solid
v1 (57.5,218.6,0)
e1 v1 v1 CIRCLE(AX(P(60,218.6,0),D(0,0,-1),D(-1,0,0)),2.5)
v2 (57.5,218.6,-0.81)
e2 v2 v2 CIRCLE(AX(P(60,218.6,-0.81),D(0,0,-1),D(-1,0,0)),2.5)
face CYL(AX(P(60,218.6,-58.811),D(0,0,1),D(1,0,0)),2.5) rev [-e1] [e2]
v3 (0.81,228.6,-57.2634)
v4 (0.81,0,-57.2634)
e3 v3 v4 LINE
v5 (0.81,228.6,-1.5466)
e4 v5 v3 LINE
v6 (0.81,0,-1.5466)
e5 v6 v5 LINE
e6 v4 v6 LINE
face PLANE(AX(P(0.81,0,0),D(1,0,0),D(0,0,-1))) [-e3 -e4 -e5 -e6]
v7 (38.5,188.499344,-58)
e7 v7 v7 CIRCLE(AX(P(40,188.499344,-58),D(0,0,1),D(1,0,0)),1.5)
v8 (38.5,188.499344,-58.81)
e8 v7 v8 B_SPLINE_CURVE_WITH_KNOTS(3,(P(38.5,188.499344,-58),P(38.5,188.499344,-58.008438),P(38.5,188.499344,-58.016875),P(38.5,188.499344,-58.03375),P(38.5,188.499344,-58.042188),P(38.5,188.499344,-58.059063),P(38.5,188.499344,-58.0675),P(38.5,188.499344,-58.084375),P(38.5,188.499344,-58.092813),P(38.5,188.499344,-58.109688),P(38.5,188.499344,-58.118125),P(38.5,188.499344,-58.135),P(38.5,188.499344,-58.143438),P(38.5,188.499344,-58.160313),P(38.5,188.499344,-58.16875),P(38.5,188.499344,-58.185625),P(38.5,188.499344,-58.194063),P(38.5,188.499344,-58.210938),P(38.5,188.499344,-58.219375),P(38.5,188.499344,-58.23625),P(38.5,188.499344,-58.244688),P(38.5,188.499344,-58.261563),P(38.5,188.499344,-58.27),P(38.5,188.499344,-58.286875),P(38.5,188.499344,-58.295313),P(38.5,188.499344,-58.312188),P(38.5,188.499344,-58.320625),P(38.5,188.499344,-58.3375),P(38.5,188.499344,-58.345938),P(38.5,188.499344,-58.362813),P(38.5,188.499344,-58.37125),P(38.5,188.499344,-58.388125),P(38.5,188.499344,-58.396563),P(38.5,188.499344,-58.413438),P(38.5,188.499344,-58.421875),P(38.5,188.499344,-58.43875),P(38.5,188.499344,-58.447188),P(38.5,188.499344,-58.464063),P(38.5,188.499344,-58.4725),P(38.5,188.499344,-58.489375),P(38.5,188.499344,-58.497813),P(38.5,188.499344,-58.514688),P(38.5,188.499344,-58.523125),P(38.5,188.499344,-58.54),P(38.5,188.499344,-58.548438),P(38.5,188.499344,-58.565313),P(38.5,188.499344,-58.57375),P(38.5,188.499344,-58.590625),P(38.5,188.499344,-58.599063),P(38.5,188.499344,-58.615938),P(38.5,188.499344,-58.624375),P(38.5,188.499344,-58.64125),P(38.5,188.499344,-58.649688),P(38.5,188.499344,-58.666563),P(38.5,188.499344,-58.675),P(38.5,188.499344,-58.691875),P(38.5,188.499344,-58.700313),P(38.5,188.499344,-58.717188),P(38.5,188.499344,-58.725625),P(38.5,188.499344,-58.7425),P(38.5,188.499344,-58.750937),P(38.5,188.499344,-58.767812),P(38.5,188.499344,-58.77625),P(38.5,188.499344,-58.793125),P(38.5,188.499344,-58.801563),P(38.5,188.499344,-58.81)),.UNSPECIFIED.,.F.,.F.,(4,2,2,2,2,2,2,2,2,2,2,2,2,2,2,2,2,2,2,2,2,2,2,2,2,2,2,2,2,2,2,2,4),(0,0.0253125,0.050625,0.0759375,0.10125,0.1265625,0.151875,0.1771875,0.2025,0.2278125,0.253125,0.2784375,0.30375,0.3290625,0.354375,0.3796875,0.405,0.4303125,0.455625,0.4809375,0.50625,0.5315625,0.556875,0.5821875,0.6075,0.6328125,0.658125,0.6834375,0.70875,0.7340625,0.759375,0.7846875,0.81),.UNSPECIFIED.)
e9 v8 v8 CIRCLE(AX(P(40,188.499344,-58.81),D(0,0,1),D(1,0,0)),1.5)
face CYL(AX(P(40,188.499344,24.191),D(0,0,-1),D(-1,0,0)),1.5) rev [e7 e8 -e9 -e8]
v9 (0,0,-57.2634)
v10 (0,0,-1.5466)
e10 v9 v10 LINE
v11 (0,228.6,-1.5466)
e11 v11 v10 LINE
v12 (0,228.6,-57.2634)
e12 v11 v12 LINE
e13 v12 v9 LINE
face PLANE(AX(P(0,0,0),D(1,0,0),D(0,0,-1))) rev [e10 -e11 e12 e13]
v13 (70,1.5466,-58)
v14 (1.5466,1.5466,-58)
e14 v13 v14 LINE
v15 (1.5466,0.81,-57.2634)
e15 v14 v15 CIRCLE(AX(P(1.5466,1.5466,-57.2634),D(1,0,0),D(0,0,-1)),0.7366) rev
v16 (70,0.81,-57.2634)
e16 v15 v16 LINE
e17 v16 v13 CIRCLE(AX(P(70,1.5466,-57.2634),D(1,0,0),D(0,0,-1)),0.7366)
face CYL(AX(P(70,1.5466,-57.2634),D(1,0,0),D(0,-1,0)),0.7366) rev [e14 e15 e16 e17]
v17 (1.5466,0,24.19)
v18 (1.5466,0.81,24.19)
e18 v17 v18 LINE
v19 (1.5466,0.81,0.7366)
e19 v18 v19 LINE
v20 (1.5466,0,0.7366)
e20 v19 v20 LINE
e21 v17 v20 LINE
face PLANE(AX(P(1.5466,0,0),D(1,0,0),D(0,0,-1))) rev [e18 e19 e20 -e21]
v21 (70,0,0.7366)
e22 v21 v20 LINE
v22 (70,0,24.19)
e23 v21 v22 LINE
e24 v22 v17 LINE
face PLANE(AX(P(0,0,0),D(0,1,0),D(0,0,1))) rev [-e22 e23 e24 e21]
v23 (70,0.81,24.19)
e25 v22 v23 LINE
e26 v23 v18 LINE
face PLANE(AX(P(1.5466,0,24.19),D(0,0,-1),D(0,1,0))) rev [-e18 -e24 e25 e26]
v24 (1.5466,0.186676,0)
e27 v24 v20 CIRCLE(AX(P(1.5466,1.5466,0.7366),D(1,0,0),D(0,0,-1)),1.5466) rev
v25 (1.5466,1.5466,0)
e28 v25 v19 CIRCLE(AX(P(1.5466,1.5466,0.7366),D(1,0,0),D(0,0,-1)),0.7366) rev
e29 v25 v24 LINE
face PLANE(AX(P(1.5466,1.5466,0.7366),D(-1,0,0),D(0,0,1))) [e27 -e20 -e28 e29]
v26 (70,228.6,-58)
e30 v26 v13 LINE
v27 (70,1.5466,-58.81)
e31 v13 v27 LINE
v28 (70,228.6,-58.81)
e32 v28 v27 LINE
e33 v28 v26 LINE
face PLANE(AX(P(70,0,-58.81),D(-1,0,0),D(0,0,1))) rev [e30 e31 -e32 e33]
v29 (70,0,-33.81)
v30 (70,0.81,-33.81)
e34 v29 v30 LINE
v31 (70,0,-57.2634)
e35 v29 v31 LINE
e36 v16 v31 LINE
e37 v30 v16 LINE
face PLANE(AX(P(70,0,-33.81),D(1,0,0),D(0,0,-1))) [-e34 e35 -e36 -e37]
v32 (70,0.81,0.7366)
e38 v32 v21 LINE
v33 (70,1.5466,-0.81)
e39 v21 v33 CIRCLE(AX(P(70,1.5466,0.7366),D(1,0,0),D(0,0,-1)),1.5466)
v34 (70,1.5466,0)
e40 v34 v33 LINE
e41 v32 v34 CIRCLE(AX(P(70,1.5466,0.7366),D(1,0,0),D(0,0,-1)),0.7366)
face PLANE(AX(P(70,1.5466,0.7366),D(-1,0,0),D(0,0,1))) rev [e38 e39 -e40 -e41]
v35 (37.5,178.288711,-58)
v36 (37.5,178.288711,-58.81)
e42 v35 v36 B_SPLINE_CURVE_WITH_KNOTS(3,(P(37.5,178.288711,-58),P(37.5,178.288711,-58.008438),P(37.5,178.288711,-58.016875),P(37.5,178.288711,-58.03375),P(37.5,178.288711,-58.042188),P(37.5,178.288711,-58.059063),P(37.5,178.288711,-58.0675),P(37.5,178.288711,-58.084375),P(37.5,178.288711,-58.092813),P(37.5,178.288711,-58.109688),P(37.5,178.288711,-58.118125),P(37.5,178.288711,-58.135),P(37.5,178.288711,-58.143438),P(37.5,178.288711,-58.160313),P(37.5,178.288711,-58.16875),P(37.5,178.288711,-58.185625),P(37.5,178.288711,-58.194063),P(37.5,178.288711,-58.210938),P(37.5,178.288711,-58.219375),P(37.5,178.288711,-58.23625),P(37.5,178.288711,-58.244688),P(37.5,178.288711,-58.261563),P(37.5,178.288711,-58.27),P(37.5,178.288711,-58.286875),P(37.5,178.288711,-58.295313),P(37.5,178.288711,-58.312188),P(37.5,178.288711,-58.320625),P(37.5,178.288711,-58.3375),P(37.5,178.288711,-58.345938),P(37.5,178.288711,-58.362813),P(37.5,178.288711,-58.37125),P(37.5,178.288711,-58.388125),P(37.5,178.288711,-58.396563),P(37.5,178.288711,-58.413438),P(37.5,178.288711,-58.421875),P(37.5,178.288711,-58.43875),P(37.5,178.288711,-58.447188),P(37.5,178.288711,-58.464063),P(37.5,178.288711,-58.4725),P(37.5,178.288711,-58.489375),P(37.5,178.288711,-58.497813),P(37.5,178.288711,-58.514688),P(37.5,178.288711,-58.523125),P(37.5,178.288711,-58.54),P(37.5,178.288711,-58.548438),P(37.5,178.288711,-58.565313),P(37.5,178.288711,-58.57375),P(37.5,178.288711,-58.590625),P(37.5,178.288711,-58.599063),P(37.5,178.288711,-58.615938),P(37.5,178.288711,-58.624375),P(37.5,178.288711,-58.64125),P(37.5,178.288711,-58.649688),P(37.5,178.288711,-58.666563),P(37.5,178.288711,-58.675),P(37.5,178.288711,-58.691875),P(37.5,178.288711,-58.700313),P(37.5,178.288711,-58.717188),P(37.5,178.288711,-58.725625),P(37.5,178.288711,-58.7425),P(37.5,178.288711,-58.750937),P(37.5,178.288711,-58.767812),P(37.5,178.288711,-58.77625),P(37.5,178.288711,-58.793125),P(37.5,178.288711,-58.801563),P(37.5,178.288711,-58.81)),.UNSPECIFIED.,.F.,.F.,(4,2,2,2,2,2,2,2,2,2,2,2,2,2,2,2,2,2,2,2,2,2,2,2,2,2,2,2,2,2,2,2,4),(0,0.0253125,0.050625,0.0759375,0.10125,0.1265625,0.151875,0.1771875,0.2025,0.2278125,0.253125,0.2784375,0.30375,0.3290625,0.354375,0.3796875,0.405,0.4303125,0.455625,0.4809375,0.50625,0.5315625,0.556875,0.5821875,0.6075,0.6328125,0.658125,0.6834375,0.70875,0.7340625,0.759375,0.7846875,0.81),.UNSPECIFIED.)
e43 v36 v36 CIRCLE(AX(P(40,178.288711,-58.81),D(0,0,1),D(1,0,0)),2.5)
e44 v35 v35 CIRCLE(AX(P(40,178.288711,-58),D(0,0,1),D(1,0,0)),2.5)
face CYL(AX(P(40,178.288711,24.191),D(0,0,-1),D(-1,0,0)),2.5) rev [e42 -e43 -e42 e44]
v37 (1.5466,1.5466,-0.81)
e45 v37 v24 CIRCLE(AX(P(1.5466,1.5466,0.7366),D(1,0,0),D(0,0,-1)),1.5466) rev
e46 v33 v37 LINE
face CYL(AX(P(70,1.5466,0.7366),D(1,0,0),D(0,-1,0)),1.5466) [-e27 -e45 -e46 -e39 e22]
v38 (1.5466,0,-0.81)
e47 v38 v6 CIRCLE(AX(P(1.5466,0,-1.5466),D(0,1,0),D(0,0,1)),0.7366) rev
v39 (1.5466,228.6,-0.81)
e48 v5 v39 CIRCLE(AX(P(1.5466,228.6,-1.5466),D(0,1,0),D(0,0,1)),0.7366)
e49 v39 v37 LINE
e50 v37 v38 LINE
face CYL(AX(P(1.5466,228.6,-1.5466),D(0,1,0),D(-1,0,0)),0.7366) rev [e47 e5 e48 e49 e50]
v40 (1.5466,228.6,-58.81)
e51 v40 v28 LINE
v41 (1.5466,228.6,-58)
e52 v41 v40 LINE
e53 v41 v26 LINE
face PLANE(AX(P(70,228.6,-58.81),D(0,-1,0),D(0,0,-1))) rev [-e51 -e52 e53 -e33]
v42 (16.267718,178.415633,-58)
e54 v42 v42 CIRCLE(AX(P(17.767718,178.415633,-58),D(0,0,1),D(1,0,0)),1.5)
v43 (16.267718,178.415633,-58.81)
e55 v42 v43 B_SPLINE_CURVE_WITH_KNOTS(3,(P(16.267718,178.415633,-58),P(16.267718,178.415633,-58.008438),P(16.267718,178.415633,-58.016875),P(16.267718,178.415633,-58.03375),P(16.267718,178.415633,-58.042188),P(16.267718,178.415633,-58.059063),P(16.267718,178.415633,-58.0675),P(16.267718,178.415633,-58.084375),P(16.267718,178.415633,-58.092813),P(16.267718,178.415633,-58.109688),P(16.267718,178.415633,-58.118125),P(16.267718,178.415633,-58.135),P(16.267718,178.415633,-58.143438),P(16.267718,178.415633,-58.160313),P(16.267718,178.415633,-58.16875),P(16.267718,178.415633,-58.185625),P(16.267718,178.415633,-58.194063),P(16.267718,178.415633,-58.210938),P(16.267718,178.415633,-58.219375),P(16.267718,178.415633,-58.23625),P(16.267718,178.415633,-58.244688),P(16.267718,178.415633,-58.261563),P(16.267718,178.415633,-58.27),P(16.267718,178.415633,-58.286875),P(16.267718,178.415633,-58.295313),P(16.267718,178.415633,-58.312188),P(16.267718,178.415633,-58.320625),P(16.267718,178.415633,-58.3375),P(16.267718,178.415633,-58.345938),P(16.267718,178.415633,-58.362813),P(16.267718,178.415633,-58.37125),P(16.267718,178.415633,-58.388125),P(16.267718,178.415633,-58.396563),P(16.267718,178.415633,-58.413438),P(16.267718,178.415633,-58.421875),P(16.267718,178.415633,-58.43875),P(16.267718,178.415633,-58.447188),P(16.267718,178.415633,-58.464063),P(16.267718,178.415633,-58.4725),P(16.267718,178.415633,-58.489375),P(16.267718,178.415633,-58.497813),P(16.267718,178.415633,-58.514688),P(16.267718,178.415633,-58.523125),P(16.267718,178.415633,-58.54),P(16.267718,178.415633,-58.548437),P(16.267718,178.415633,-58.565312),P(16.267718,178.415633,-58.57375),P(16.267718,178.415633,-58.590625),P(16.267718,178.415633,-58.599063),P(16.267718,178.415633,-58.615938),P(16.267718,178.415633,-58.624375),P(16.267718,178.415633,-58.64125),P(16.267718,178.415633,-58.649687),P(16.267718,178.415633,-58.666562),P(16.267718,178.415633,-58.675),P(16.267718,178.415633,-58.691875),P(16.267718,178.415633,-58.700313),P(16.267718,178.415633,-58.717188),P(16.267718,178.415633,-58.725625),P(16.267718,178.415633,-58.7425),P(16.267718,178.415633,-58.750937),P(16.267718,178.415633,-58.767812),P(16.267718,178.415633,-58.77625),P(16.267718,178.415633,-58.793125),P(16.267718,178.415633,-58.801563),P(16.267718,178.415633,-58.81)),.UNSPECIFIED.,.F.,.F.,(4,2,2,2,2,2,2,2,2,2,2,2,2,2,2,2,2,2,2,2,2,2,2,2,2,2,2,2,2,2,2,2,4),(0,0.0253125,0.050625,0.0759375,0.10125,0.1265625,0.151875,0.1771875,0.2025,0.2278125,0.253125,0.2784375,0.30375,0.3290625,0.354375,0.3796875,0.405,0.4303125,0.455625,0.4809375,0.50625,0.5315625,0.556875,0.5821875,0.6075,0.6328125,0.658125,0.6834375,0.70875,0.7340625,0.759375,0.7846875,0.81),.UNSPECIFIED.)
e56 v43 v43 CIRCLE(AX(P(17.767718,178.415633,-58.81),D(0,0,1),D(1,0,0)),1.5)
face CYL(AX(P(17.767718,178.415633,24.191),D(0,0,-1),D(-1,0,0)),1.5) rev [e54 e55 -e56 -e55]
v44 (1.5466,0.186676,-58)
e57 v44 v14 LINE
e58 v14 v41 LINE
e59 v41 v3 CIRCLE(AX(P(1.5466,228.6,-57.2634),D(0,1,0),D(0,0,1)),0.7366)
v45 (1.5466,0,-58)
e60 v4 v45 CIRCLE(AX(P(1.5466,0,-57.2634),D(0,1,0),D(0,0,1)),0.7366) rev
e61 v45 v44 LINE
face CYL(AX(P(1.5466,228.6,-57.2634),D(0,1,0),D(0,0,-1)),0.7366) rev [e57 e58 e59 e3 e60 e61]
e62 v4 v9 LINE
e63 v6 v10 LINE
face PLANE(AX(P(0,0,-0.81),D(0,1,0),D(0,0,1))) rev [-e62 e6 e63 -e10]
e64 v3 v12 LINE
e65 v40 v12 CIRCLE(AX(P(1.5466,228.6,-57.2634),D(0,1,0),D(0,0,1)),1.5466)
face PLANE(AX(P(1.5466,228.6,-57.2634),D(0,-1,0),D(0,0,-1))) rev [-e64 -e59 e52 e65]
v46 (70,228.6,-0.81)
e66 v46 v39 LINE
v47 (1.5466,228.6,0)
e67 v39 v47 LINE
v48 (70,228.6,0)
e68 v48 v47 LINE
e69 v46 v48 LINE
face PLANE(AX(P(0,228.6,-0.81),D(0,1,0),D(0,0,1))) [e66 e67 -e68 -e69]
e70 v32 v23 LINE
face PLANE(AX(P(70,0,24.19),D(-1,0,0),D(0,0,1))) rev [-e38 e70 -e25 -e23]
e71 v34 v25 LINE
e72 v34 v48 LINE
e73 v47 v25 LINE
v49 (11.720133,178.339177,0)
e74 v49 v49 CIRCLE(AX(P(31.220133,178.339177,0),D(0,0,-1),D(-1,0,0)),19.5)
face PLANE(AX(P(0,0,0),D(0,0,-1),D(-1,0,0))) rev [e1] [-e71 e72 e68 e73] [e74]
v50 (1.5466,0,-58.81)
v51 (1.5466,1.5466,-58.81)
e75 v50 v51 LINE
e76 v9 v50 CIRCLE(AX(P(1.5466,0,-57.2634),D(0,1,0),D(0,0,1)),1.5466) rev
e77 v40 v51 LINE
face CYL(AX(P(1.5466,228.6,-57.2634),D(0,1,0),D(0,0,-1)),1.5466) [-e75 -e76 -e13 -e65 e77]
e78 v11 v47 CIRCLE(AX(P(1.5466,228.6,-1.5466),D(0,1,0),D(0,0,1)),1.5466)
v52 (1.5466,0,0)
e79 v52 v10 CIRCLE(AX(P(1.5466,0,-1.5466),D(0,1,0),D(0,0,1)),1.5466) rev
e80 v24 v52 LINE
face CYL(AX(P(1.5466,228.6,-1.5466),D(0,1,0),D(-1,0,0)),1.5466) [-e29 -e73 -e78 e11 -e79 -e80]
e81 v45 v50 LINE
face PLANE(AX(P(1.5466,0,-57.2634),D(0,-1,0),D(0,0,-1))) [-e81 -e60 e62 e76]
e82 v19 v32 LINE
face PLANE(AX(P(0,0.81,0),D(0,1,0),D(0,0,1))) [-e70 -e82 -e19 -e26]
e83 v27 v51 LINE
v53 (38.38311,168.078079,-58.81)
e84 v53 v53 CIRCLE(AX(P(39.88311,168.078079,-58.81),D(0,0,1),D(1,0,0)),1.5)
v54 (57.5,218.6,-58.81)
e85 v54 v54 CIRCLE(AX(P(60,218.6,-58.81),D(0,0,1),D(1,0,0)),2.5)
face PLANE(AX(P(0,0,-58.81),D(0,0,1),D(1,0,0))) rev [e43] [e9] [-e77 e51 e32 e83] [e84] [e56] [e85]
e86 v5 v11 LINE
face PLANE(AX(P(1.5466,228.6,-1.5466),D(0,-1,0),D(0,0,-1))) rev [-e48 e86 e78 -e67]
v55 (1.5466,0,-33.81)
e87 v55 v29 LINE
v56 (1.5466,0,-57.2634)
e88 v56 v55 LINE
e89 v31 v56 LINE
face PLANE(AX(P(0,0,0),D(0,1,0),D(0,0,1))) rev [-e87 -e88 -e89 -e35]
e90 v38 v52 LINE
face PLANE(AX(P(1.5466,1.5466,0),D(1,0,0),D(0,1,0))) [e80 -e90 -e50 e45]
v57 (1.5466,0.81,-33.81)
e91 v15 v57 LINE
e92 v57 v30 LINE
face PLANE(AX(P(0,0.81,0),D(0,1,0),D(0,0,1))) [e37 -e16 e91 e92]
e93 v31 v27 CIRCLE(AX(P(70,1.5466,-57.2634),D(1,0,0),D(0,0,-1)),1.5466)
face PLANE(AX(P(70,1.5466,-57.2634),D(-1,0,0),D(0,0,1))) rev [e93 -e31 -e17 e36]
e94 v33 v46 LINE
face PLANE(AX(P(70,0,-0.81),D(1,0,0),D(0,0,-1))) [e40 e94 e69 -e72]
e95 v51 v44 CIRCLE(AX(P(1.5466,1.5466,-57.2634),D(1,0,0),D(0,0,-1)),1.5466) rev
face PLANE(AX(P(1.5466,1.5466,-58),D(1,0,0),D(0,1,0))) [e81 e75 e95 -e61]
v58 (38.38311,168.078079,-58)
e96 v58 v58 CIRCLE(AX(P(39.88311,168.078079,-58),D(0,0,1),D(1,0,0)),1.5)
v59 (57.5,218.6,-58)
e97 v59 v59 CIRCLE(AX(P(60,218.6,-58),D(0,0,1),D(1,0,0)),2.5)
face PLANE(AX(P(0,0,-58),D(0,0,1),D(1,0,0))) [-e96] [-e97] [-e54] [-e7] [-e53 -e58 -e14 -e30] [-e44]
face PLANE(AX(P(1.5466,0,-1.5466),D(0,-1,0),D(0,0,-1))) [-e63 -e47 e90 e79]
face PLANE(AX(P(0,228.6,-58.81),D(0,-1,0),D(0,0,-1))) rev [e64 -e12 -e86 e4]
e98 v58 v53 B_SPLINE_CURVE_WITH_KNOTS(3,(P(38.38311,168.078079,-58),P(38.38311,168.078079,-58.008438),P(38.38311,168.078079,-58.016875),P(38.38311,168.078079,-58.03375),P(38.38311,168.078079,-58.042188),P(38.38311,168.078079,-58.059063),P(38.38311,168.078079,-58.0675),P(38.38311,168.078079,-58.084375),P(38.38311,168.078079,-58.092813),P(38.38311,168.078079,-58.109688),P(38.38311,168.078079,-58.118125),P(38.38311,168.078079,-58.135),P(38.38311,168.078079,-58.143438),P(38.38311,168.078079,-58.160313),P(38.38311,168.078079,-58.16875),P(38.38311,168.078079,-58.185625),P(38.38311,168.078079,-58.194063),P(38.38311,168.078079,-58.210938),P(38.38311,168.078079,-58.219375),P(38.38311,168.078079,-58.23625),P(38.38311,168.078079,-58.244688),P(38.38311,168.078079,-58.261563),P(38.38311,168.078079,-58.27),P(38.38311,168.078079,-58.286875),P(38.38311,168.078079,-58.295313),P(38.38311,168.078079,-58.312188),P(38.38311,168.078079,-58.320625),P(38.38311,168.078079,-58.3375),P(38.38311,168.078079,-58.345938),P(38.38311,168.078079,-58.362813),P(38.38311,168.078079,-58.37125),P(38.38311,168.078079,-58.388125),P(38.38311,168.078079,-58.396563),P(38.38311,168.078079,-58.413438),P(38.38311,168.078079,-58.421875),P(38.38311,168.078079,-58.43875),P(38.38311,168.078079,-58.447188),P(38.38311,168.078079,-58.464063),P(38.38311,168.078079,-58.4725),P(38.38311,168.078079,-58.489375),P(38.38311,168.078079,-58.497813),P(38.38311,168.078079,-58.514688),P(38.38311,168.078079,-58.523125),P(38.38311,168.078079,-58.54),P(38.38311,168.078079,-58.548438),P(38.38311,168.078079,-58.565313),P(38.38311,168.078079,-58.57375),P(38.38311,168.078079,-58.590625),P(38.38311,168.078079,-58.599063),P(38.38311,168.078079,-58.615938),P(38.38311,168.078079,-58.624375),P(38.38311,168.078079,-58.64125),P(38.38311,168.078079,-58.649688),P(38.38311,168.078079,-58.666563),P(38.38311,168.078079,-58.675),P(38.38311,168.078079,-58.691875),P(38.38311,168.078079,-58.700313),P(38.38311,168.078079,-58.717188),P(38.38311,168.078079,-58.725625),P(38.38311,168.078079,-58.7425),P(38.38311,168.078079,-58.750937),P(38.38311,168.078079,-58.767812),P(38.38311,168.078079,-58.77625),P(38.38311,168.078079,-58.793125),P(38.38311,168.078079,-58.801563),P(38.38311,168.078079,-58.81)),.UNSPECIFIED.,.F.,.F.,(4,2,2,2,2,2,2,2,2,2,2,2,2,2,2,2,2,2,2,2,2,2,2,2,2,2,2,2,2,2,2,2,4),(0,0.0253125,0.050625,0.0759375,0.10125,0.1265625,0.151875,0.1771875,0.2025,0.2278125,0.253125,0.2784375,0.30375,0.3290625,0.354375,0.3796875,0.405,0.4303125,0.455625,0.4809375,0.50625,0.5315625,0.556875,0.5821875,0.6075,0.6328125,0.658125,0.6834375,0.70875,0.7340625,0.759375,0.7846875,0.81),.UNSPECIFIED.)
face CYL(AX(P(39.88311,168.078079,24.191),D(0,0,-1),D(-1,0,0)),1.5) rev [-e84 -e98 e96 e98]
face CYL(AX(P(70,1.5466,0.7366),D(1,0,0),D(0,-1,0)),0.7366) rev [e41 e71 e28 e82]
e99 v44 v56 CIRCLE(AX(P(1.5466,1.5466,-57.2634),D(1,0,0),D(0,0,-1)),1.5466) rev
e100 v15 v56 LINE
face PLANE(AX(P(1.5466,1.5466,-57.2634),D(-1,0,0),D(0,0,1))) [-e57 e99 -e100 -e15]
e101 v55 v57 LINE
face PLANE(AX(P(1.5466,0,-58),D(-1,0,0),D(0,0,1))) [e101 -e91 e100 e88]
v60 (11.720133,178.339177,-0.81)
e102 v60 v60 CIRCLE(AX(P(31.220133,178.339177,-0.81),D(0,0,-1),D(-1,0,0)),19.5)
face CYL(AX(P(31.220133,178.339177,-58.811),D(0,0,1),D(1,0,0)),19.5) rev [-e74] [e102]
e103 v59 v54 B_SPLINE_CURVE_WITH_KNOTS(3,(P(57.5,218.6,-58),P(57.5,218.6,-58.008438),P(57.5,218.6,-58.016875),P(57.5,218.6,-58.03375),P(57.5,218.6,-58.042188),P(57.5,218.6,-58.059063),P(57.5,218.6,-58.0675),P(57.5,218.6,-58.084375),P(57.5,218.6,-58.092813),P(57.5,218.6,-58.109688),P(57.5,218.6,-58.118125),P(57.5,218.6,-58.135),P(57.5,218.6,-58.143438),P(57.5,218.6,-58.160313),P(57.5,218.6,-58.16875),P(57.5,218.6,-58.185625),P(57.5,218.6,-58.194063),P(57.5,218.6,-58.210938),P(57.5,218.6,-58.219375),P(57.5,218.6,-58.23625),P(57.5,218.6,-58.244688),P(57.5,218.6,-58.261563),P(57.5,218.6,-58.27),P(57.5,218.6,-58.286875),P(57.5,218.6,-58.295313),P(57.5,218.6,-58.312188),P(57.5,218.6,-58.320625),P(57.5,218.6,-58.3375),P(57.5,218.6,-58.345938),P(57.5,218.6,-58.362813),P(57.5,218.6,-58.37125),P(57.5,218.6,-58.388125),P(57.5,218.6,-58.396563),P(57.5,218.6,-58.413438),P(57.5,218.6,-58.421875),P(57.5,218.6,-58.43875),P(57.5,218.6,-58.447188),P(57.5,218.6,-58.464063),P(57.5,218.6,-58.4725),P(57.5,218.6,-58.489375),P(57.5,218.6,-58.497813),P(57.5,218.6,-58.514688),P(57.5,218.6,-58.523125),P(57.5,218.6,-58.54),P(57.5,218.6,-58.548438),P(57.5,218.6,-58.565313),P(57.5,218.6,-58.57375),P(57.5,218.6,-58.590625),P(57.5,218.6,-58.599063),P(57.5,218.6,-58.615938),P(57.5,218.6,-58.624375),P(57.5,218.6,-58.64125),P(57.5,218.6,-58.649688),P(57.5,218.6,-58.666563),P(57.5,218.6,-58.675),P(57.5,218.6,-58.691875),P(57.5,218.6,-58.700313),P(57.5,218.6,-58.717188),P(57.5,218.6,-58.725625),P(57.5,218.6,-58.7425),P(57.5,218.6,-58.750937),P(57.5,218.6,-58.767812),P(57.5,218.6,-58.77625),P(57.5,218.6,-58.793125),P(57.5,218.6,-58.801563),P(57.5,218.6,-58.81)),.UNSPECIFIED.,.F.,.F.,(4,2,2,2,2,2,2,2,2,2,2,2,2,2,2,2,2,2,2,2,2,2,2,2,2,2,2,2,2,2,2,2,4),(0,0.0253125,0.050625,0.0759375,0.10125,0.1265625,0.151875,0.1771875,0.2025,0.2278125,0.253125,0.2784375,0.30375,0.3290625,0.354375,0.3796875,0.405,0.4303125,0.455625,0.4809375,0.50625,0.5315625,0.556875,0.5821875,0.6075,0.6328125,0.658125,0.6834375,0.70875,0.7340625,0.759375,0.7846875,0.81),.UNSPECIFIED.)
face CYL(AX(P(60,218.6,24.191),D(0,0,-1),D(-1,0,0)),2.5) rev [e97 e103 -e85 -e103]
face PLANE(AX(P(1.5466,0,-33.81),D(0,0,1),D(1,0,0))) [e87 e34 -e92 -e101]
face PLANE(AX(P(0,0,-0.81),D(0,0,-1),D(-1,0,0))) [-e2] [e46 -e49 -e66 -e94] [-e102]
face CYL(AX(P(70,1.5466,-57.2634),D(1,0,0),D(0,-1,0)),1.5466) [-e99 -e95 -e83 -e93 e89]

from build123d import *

# Parameters (mm, degrees)
SKETCH1_W                      = 70
SKETCH1_H                      = 228.6
BASE_FLANGE1_DEPTH             = 0.81
EDGE_FLANGE1_STRIP_W           = 4.7132
EDGE_FLANGE1_STRIP_H           = 0.81
EDGE_FLANGE1_STRIP_CUT_DEPTH   = 228.6
EDGE_FLANGE1_DEPTH             = 228.6
EDGE_FLANGE2_STRIP_W           = 4.7132
EDGE_FLANGE2_STRIP_H           = 0.81
EDGE_FLANGE2_STRIP_CUT_DEPTH   = 228.6
EDGE_FLANGE2_DEPTH             = 228.6
EDGE_FLANGE3_STRIP_W           = 4.7132
EDGE_FLANGE3_STRIP_H           = 0.81
EDGE_FLANGE3_STRIP_CUT_DEPTH   = 68.4534
EDGE_FLANGE3_STRIP_2_W         = 4.7132
EDGE_FLANGE3_STRIP_2_H         = 0.81
EDGE_FLANGE3_STRIP_CUT_2_DEPTH = 68.4534
EDGE_FLANGE3_DEPTH             = 68.4534
EDGE_FLANGE3_BEND_DEPTH        = 68.4534
CUT_EXTRUDE2_REACH             = 255.075
SKETCH18_R                     = 2.5
SKETCH18_R_2                   = 1.5
CUT_EXTRUDE1_REACH             = 248.204
SKETCH17_R                     = 19.5
SKETCH17_R_2                   = 2.5


# Sheet-metal steps are written as plain solids
with BuildPart() as part:
    # Sketch1 → Base-Flange1 (new body)
    with BuildSketch(Plane.XY):
        with Locations((35, 114.3)):
            Rectangle(SKETCH1_W, SKETCH1_H)
    extrude(amount=-BASE_FLANGE1_DEPTH)

    # Edge-Flange1 strip (across the edge) → Edge-Flange1 strip cut (cut)
    with BuildSketch(Plane(origin=(0, 0, -0.81), x_dir=(1, 0, 0), z_dir=(0, 1, 0))):
        with Locations((-0.81, -0.405)):
            Rectangle(EDGE_FLANGE1_STRIP_W, EDGE_FLANGE1_STRIP_H)
    extrude(amount=EDGE_FLANGE1_STRIP_CUT_DEPTH, mode=Mode.SUBTRACT)

    # Edge-Flange1 section (across the edge) → Edge-Flange1 (add)
    with BuildSketch(Plane(origin=(0, 0, -0.81), x_dir=(1, 0, 0), z_dir=(0, 1, 0))):
        with BuildLine():
            Line((0, 0.7366), (0, 58))
            Line((0, 58), (0.81, 58))
            Line((0.81, 58), (0.81, 0.7366))
            ThreePointArc((0.81, 0.7366), (1.025745145, 0.215745145), (1.5466, 0))
            Line((1.5466, 0), (1.5466, -0.81))
            ThreePointArc((1.5466, -0.81), (0.452988652, -0.357011348), (0, 0.7366))
        make_face()
    extrude(amount=EDGE_FLANGE1_DEPTH)

    # Edge-Flange2 strip (across the edge) → Edge-Flange2 strip cut (cut)
    with BuildSketch(Plane(origin=(0.81, 0, -58.81), x_dir=(0, 0, 1), z_dir=(0, 1, 0))):
        with Locations((-0.81, -0.405)):
            Rectangle(EDGE_FLANGE2_STRIP_W, EDGE_FLANGE2_STRIP_H)
    extrude(amount=EDGE_FLANGE2_STRIP_CUT_DEPTH, mode=Mode.SUBTRACT)

    # Edge-Flange2 section (across the edge) → Edge-Flange2 (add)
    with BuildSketch(Plane(origin=(0.81, 0, -58.81), x_dir=(0, 0, 1), z_dir=(0, 1, 0))):
        with BuildLine():
            Line((0, 0.7366), (0, 69.19))
            Line((0, 69.19), (0.81, 69.19))
            Line((0.81, 69.19), (0.81, 0.7366))
            ThreePointArc((0.81, 0.7366), (1.025745145, 0.215745145), (1.5466, 0))
            Line((1.5466, 0), (1.5466, -0.81))
            ThreePointArc((1.5466, -0.81), (0.452988652, -0.357011348), (0, 0.7366))
        make_face()
    extrude(amount=EDGE_FLANGE2_DEPTH)

    # Edge-Flange3 strip (across the edge) → Edge-Flange3 strip cut (cut)
    with BuildSketch(Plane.YZ.offset(1.5466)):
        with Locations((-0.81, -0.405)):
            Rectangle(EDGE_FLANGE3_STRIP_W, EDGE_FLANGE3_STRIP_H)
    extrude(amount=EDGE_FLANGE3_STRIP_CUT_DEPTH, mode=Mode.SUBTRACT)

    # Edge-Flange3 strip 2 (across the edge) → Edge-Flange3 strip cut 2 (cut)
    with BuildSketch(Plane(origin=(1.5466, 0, -58), x_dir=(0, 1, 0), z_dir=(1, 0, 0))):
        with Locations((-0.81, -0.405)):
            Rectangle(EDGE_FLANGE3_STRIP_2_W, EDGE_FLANGE3_STRIP_2_H)
    extrude(amount=EDGE_FLANGE3_STRIP_CUT_2_DEPTH, mode=Mode.SUBTRACT)

    # Edge-Flange3 section (across the edge) → Edge-Flange3 (add)
    with BuildSketch(Plane.YZ.offset(1.5466)):
        with BuildLine():
            Line((0, 0.7366), (0, 24.19))
            Line((0, 24.19), (0.81, 24.19))
            Line((0.81, 24.19), (0.81, 0.7366))
            ThreePointArc((0.81, 0.7366), (1.025745145, 0.215745145), (1.5466, 0))
            Line((1.5466, 0), (1.5466, -0.81))
            ThreePointArc((1.5466, -0.81), (0.452988652, -0.357011348), (0, 0.7366))
        make_face()
    extrude(amount=EDGE_FLANGE3_DEPTH)

    # Edge-Flange3 section 2 (across the edge) → Edge-Flange3 bend (add)
    with BuildSketch(Plane(origin=(1.5466, 0, -58), x_dir=(0, 1, 0), z_dir=(1, 0, 0))):
        with BuildLine():
            Line((0, 0.7366), (0, 24.19))
            Line((0, 24.19), (0.81, 24.19))
            Line((0.81, 24.19), (0.81, 0.7366))
            ThreePointArc((0.81, 0.7366), (1.025745145, 0.215745145), (1.5466, 0))
            Line((1.5466, 0), (1.5466, -0.81))
            ThreePointArc((1.5466, -0.81), (0.452988652, -0.357011348), (0, 0.7366))
        make_face()
    extrude(amount=EDGE_FLANGE3_BEND_DEPTH)

    # Sketch18 → Cut-Extrude2 (cut, up to next)
    with BuildSketch(Plane.XY.offset(-58.81), mode=Mode.PRIVATE) as cut_extrude2_sk1:
        with Locations(Location((40, 178.288711259, 0), (0, 0, 180))):
            Circle(SKETCH18_R)
    cut_extrude2_tool1 = extrude(cut_extrude2_sk1.sketch, amount=CUT_EXTRUDE2_REACH, mode=Mode.PRIVATE) & part.part
    # Sketch18 → Cut-Extrude2 (cut, up to next)
    with BuildSketch(Plane.XY.offset(-58.81), mode=Mode.PRIVATE) as cut_extrude2_sk2:
        with Locations(Location((60, 218.6, 0), (0, 0, 180))):
            Circle(SKETCH18_R)
    cut_extrude2_tool2 = extrude(cut_extrude2_sk2.sketch, amount=CUT_EXTRUDE2_REACH, mode=Mode.PRIVATE) & part.part
    # Sketch18 → Cut-Extrude2 (cut, up to next)
    with BuildSketch(Plane.XY.offset(-58.81), mode=Mode.PRIVATE) as cut_extrude2_sk3:
        with Locations(Location((39.883110044, 168.078078525, 0), (0, 0, 180))):
            Circle(SKETCH18_R_2)
    cut_extrude2_tool3 = extrude(cut_extrude2_sk3.sketch, amount=CUT_EXTRUDE2_REACH, mode=Mode.PRIVATE) & part.part
    # Sketch18 → Cut-Extrude2 (cut, up to next)
    with BuildSketch(Plane.XY.offset(-58.81), mode=Mode.PRIVATE) as cut_extrude2_sk4:
        with Locations(Location((40, 188.499343992, 0), (0, 0, 180))):
            Circle(SKETCH18_R_2)
    cut_extrude2_tool4 = extrude(cut_extrude2_sk4.sketch, amount=CUT_EXTRUDE2_REACH, mode=Mode.PRIVATE) & part.part
    # Sketch18 → Cut-Extrude2 (cut, up to next)
    with BuildSketch(Plane.XY.offset(-58.81), mode=Mode.PRIVATE) as cut_extrude2_sk5:
        with Locations(Location((17.767718264, 178.415632815, 0), (0, 0, 180))):
            Circle(SKETCH18_R_2)
    cut_extrude2_tool5 = extrude(cut_extrude2_sk5.sketch, amount=CUT_EXTRUDE2_REACH, mode=Mode.PRIVATE) & part.part
    add(cut_extrude2_tool1.solids().sort_by_distance((40, 178.288711, -58.81))[0], mode=Mode.SUBTRACT)
    add(cut_extrude2_tool2.solids().sort_by_distance((60, 218.6, -58.81))[0], mode=Mode.SUBTRACT)
    add(cut_extrude2_tool3.solids().sort_by_distance((39.88311, 168.078079, -58.81))[0], mode=Mode.SUBTRACT)
    add(cut_extrude2_tool4.solids().sort_by_distance((40, 188.499344, -58.81))[0], mode=Mode.SUBTRACT)
    add(cut_extrude2_tool5.solids().sort_by_distance((17.767718, 178.415633, -58.81))[0], mode=Mode.SUBTRACT)

    # Sketch17 → Cut-Extrude1 (cut, up to next)
    with BuildSketch(Plane(origin=(0, 0, 0), x_dir=(-1, 0, 0), z_dir=(0, 0, -1)), mode=Mode.PRIVATE) as cut_extrude1_sk1:
        with Locations((-31.22013265, 178.33917696)):
            Circle(SKETCH17_R)
    cut_extrude1_tool1 = extrude(cut_extrude1_sk1.sketch, amount=CUT_EXTRUDE1_REACH, mode=Mode.PRIVATE) & part.part
    # Sketch17 → Cut-Extrude1 (cut, up to next)
    with BuildSketch(Plane(origin=(0, 0, 0), x_dir=(-1, 0, 0), z_dir=(0, 0, -1)), mode=Mode.PRIVATE) as cut_extrude1_sk2:
        with Locations((-60, 218.6)):
            Circle(SKETCH17_R_2)
    cut_extrude1_tool2 = extrude(cut_extrude1_sk2.sketch, amount=CUT_EXTRUDE1_REACH, mode=Mode.PRIVATE) & part.part
    add(cut_extrude1_tool1.solids().sort_by_distance((31.220133, 178.339177, 0))[0], mode=Mode.SUBTRACT)
    add(cut_extrude1_tool2.solids().sort_by_distance((60, 218.6, 0))[0], mode=Mode.SUBTRACT)


solid = part.part
